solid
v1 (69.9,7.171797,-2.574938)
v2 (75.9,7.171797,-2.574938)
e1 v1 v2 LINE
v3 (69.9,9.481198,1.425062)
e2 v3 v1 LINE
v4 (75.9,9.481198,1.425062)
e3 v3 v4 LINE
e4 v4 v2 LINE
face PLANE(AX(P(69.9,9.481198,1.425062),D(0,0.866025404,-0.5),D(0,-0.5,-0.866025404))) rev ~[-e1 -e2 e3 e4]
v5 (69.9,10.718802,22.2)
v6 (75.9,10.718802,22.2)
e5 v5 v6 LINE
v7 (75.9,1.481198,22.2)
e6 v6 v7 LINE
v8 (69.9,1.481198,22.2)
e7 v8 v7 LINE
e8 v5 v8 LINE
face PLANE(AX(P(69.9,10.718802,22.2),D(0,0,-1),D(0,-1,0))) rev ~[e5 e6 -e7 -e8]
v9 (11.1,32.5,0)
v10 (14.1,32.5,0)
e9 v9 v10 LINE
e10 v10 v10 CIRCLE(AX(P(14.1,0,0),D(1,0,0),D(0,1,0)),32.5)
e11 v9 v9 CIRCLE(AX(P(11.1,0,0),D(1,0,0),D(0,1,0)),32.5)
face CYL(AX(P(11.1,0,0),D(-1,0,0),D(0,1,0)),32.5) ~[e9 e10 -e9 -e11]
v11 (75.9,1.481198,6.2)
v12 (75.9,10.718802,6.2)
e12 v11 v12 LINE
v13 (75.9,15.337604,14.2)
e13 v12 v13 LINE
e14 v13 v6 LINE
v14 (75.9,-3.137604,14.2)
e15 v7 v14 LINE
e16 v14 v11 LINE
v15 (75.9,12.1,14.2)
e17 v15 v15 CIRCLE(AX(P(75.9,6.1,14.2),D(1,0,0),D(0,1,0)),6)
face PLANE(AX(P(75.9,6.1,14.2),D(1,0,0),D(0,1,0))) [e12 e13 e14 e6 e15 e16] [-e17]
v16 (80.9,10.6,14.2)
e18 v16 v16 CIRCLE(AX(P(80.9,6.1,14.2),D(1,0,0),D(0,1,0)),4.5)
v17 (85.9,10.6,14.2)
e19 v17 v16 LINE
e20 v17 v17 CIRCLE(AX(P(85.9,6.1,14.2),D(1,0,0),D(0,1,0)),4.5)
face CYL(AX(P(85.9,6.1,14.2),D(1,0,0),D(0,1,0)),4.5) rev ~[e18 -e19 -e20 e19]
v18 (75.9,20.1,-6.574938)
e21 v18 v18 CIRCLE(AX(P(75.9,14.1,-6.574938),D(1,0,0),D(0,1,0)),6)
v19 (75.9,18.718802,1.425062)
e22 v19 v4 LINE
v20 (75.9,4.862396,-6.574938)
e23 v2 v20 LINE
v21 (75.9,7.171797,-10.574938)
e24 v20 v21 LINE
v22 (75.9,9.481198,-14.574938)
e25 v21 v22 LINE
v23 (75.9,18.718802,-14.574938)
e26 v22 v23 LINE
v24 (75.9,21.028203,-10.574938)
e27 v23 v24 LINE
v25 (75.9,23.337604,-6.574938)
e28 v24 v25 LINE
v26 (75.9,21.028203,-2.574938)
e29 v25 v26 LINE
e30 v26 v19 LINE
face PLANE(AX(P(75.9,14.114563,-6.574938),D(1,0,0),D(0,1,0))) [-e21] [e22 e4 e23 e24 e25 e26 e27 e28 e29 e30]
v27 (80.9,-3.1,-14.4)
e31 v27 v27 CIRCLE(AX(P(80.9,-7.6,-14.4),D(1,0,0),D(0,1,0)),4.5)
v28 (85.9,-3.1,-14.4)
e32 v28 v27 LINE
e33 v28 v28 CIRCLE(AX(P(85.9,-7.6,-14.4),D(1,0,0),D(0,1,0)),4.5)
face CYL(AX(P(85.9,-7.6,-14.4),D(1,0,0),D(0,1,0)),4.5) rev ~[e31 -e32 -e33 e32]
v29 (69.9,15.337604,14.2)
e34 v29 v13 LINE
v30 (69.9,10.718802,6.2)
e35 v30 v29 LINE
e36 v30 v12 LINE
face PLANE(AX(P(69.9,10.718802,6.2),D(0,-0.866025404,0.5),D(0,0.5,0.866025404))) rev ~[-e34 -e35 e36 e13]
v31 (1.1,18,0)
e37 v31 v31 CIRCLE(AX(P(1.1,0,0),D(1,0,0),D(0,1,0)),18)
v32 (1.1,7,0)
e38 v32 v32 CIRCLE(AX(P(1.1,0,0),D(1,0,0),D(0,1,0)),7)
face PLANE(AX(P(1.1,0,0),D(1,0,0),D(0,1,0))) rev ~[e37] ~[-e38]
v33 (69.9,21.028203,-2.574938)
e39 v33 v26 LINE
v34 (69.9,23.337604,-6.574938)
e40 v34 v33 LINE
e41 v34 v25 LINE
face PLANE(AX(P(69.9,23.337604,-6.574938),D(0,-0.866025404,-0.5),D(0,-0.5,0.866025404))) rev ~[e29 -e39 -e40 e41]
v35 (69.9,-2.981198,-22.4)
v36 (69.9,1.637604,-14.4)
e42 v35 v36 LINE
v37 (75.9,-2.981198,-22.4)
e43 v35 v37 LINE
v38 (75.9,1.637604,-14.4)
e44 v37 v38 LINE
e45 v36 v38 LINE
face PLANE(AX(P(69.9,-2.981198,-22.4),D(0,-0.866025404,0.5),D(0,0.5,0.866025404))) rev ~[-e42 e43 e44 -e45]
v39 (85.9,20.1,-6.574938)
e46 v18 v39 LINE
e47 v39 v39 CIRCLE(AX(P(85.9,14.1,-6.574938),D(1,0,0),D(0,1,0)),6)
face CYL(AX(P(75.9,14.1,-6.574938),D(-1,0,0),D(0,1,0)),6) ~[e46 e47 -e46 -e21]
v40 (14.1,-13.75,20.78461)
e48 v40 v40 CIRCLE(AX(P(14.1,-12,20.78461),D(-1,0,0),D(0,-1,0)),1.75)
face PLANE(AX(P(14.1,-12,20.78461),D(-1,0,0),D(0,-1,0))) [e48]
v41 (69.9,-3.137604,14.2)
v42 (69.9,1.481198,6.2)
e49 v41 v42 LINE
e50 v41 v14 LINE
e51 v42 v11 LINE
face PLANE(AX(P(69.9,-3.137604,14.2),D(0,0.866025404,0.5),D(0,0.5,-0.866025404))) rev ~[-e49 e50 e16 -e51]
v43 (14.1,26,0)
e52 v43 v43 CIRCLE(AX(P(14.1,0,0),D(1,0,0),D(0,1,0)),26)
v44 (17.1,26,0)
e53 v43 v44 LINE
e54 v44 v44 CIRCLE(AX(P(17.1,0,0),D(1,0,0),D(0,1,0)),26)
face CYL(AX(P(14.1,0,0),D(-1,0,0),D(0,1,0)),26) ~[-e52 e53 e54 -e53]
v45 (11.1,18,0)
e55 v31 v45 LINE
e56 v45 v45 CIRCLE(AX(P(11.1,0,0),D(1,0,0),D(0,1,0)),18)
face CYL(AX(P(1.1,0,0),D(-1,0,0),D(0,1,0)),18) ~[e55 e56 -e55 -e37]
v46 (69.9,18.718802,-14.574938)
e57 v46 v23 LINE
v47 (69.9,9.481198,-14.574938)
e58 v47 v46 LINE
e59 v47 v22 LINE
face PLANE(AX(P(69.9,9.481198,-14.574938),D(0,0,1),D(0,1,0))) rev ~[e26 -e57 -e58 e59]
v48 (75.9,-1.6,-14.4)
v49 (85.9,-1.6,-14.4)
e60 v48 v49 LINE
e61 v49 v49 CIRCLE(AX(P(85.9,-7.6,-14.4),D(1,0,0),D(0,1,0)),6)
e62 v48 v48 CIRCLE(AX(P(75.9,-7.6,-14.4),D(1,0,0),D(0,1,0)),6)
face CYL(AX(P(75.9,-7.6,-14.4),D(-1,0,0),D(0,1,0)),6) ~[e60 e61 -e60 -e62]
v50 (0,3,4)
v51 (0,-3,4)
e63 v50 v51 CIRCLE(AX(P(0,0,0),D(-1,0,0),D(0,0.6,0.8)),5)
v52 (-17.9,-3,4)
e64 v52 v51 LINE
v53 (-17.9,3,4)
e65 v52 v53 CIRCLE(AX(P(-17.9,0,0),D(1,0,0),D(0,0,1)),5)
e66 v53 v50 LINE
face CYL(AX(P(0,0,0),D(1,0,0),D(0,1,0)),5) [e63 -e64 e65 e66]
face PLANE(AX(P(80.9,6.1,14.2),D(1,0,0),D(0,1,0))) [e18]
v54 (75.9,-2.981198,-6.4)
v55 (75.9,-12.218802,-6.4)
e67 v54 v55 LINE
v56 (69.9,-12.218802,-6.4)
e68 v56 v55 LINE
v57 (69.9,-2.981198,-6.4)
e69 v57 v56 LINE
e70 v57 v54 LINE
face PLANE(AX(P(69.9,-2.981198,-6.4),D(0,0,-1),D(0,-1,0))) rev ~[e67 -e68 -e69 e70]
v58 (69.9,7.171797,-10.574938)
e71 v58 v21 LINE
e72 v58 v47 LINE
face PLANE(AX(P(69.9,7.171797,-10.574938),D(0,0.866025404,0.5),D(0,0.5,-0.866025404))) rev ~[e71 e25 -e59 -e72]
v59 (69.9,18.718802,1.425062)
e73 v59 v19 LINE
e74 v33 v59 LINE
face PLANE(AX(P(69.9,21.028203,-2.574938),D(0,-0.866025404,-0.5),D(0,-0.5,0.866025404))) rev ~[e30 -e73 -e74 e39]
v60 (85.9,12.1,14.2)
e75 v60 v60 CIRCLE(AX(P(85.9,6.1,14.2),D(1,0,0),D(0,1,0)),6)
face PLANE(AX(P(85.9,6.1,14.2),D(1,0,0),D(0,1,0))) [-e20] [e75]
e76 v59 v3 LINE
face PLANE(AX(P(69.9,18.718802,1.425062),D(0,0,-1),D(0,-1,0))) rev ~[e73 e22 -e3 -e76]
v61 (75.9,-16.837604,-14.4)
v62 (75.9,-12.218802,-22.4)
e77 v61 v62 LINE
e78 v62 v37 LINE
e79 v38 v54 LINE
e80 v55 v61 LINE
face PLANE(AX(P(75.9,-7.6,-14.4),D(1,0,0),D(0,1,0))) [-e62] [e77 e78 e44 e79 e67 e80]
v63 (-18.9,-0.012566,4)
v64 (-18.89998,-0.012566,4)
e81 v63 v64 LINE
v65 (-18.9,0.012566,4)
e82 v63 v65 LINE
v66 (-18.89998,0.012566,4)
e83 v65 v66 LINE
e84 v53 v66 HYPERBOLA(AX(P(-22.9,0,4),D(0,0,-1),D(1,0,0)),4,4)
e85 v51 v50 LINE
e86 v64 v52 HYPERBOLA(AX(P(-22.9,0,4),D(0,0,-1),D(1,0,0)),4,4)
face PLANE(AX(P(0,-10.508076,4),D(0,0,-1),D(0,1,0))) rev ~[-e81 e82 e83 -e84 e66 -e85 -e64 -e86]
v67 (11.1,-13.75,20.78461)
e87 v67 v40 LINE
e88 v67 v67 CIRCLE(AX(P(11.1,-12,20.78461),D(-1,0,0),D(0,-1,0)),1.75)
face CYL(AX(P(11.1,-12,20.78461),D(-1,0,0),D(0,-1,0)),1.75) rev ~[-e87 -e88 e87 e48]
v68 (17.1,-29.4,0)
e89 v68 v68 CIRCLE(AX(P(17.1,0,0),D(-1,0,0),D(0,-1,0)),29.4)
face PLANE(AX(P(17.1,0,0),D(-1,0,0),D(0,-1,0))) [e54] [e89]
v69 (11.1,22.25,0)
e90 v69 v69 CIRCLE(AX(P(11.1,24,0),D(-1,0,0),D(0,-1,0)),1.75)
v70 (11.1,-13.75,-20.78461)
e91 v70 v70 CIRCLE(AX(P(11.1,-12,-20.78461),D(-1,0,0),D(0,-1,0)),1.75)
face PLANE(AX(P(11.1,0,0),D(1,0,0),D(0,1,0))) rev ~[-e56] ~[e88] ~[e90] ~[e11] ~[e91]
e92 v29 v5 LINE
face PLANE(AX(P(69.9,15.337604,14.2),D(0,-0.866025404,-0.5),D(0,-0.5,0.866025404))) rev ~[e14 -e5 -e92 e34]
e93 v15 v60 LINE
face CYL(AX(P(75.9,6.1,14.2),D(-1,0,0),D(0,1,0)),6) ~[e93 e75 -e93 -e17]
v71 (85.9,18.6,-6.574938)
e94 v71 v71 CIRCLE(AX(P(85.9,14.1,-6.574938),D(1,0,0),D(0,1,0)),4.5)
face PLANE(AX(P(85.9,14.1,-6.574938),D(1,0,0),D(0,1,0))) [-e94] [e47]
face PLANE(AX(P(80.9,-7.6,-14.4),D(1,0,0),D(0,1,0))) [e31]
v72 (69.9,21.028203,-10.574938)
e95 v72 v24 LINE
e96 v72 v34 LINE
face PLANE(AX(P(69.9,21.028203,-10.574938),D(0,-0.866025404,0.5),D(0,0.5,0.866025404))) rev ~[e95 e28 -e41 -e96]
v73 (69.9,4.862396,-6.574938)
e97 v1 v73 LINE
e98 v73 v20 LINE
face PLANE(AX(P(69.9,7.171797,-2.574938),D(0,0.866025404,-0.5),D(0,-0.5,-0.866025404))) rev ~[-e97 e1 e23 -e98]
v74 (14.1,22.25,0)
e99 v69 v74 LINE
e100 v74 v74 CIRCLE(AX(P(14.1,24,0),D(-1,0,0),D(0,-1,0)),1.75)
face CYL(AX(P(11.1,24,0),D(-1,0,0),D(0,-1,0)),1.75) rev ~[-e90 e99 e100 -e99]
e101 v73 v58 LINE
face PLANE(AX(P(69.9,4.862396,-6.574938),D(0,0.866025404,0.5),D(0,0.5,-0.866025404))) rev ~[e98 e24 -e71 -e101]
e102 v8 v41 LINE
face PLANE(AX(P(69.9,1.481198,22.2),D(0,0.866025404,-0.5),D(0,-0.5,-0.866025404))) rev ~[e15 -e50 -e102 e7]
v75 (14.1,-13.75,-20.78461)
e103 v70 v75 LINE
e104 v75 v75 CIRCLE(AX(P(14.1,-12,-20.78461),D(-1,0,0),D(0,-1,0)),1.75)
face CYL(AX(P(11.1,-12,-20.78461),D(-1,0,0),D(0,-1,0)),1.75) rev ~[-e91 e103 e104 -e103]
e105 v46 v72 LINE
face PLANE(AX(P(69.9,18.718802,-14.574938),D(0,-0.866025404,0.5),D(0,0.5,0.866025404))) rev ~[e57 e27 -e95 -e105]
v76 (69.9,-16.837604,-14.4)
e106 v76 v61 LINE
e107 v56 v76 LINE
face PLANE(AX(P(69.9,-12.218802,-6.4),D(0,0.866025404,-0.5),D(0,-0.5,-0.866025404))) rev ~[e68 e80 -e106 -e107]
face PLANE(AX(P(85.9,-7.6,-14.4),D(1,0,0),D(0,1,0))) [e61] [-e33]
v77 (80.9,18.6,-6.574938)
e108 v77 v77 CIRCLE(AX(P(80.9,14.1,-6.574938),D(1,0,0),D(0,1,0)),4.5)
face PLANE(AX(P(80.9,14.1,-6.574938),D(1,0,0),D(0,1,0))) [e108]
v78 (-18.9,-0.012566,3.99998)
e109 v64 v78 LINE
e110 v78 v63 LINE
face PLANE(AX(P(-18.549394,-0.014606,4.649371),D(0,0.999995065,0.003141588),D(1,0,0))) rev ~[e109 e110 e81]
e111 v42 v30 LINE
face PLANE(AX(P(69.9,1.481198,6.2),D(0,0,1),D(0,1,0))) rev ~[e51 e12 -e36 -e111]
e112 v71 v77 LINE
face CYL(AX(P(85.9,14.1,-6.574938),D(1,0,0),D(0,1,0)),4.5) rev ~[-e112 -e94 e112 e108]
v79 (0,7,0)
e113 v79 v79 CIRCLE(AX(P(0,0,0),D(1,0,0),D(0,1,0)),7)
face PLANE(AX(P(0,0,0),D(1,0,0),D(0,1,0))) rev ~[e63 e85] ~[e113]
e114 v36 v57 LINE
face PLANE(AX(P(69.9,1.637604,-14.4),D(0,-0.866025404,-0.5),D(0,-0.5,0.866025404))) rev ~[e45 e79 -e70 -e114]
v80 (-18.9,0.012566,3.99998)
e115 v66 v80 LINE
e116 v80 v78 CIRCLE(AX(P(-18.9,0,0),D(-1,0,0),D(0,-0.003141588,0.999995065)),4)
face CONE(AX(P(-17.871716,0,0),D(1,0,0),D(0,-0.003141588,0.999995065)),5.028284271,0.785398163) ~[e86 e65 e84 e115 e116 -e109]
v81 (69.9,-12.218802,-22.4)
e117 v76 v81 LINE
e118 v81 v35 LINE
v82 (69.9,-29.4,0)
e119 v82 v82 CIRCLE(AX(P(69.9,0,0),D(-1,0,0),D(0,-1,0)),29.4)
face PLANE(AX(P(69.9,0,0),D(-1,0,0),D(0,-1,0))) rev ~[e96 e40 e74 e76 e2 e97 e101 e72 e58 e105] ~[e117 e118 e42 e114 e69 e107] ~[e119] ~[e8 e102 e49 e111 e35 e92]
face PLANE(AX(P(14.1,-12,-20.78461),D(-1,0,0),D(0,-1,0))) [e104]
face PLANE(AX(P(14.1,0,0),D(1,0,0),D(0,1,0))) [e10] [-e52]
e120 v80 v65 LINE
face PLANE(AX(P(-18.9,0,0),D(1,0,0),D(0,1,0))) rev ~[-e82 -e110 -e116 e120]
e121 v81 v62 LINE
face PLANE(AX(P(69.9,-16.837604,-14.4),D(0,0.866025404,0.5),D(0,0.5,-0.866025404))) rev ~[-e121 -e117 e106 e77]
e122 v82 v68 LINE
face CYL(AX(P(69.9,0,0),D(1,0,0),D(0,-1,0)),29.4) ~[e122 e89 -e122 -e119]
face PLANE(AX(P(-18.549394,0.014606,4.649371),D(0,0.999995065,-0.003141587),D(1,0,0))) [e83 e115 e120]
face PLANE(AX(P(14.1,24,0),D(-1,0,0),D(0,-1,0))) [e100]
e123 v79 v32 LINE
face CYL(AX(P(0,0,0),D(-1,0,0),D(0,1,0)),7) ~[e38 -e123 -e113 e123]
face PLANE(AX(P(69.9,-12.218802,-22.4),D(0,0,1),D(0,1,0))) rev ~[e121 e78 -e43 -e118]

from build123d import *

# Parameters (mm, degrees)
F0_R        = 5
F1_DEPTH    = 18.9
F2_W        = 21.1690347642
F2_H        = 4.931249544
F3_DEPTH    = 18.901
F4_T2_ANGLE = 359.64
F5_R        = 7
F6_DEPTH    = 1.1
F7_R        = 18
F8_DEPTH    = 10
F9_R        = 32.5
F10_DEPTH   = 3
F11_R       = 26
F12_DEPTH   = 3
F14_R       = 29.4
F15_DEPTH   = 52.8
F16_R       = 1.75
F17_DEPTH   = 3
F19_DEPTH   = 6
F20_R       = 6
F21_DEPTH   = 10
F22_R       = 4.5
F23_DEPTH   = 5


# Not quite as in the source:
# - a fillet or chamfer that OpenCascade refuses, or shapes differently, is made with other operations: its cross-section is extruded or revolved along the edge and cut away or added


with BuildPart() as f1:
    # F0 (on Right) → F1 (new body)
    with BuildSketch(Plane.YZ):
        Circle(F0_R)
    extrude(amount=-F1_DEPTH)

    # F2 (on Right) → F3 (cut, through all)
    with BuildSketch(Plane.YZ):
        with Locations((0.0764410943, 6.465624772)):
            Rectangle(F2_W, F2_H)
    extrude(amount=-F3_DEPTH, mode=Mode.SUBTRACT)

    # F4: chamfer of 1 on 1 edges, made by hand

    # F4_s1 → F4_t2 (revolve, cut)
    with BuildSketch(Plane(origin=(0, 0, 0), x_dir=(1, 0, 0), z_dir=(0, 0.9999950652, 0.0031415875))):
        with BuildLine():
            Line((-17.8717157288, -5.0282842712), (-18.9282842712, -3.9717157288))
            Line((-18.9282842712, -3.9717157288), (-18.9482842712, -3.9717157288))
            ThreePointArc((-18.9482842712, -3.9717157288), (-18.92, -4.4858578644), (-18.92, -5))
            Line((-18.92, -5), (-18.9, -5.02))
            ThreePointArc((-18.9, -5.02), (-18.3858578644, -5.02), (-17.8717157288, -5.0482842712))
            Line((-17.8717157288, -5.0482842712), (-17.8717157288, -5.0282842712))
        make_face()
    revolve(axis=Axis((-18.9, 0, 0), (1, 0, 0)), revolution_arc=F4_T2_ANGLE, mode=Mode.SUBTRACT)

    # F5 (on face) → F6 (join)
    with BuildSketch(Plane.YZ):
        Circle(F5_R)
    extrude(amount=F6_DEPTH)

    # F7 (on face) → F8 (join)
    with BuildSketch(Plane.YZ.offset(1.1)):
        Circle(F7_R)
    extrude(amount=F8_DEPTH)

    # F9 (on face) → F10 (join)
    with BuildSketch(Plane.YZ.offset(11.1)):
        Circle(F9_R)
    extrude(amount=F10_DEPTH)

    # F11 (on face) → F12 (join)
    with BuildSketch(Plane.YZ.offset(14.1)):
        Circle(F11_R)
    extrude(amount=F12_DEPTH)

    # F14 (on offset) → F15 (join, through all)
    with BuildSketch(Plane(origin=(69.9, 0, 0), x_dir=(0, -1, 0), z_dir=(-1, 0, 0))):
        Circle(F14_R)
    extrude(amount=F15_DEPTH)

    # F16 (on face) → F17 (cut)
    with BuildSketch(Plane(origin=(11.1, 0, 0), x_dir=(0, -1, 0), z_dir=(-1, 0, 0))):
        with Locations((-24, 0)):
            Circle(F16_R)
        with Locations((12, -20.7846096908)):
            Circle(F16_R)
        with Locations((12, 20.7846096908)):
            Circle(F16_R)
    extrude(amount=-F17_DEPTH, mode=Mode.SUBTRACT)

    # F18 (on face) → F19 (join)
    with BuildSketch(Plane.YZ.offset(69.9)):
        with BuildLine():
            ThreePointArc((21.0282031968, -10.574938038), (21.8274066017, -8.6454903731), (22.1, -6.57493798))
            ThreePointArc((22.1, -6.57493798), (21.8274066078, -4.5043856099), (21.0282032207, -2.5749379634))
            ThreePointArc((21.0282032207, -2.5749379634), (18.0999999917, 0.3532652551), (14.1, 1.42506202))
            ThreePointArc((14.1, 1.42506202), (10.1000001451, 0.3532653341), (7.1717969373, -2.5749376897))
            ThreePointArc((7.1717969373, -2.5749376897), (6.1, -6.5749379695), (7.1717969269, -10.5749382522))
            ThreePointArc((7.1717969269, -10.5749382522), (10.1000001361, -13.5031412888), (14.1, -14.57493798))
            ThreePointArc((14.1, -14.57493798), (18.099999971, -13.503141227), (21.0282031968, -10.574938038))
        make_face()
        with BuildLine():
            ThreePointArc((21.0282032207, -2.5749379634), (21.8274066078, -4.5043856099), (22.1, -6.57493798))
            ThreePointArc((22.1, -6.57493798), (21.8274066017, -8.6454903731), (21.0282031968, -10.574938038))
            Line((21.0282031968, -10.574938038), (23.337604307, -6.57493798))
            Line((23.337604307, -6.57493798), (21.0282032207, -2.5749379634))
        make_face()
        with BuildLine():
            ThreePointArc((14.1, 1.42506202), (18.0999999917, 0.3532652551), (21.0282032207, -2.5749379634))
            Line((21.0282032207, -2.5749379634), (18.7188021535, 1.42506202))
            Line((18.7188021535, 1.42506202), (14.1, 1.42506202))
        make_face()
        with BuildLine():
            Line((18.7188021535, -14.57493798), (21.0282031968, -10.574938038))
            ThreePointArc((21.0282031968, -10.574938038), (18.099999971, -13.503141227), (14.1, -14.57493798))
            Line((14.1, -14.57493798), (18.7188021535, -14.57493798))
        make_face()
        with BuildLine():
            ThreePointArc((7.1717969373, -2.5749376897), (10.1000001451, 0.3532653341), (14.1, 1.42506202))
            Line((14.1, 1.42506202), (9.4811978465, 1.42506202))
            Line((9.4811978465, 1.42506202), (7.1717969373, -2.5749376897))
        make_face()
        with BuildLine():
            Line((9.4811978465, -14.57493798), (14.1, -14.57493798))
            ThreePointArc((14.1, -14.57493798), (10.1000001361, -13.5031412888), (7.1717969269, -10.5749382522))
            Line((7.1717969269, -10.5749382522), (9.4811978465, -14.57493798))
        make_face()
        with BuildLine():
            ThreePointArc((7.1717969269, -10.5749382522), (6.1, -6.5749379695), (7.1717969373, -2.5749376897))
            Line((7.1717969373, -2.5749376897), (4.862395693, -6.57493798))
            Line((4.862395693, -6.57493798), (7.1717969269, -10.5749382522))
        make_face()
        Polygon((10.7188021535, 22.2), (1.4811978465, 22.2), (-3.137604307, 14.2), (1.4811978465, 6.2), (10.7188021535, 6.2), (15.337604307, 14.2), align=None)
        Polygon((-2.9811978465, -6.4), (-12.2188021535, -6.4), (-16.837604307, -14.4), (-12.2188021535, -22.4), (-2.9811978465, -22.4), (1.637604307, -14.4), align=None)
    extrude(amount=F19_DEPTH)

    # F20 (on face) → F21 (join)
    with BuildSketch(Plane.YZ.offset(75.9)):
        with Locations((6.1, 14.2)):
            Circle(F20_R)
        with Locations((14.1, -6.57493798)):
            Circle(F20_R)
        with Locations((-7.6, -14.4)):
            Circle(F20_R)
    extrude(amount=F21_DEPTH)

    # F22 (on face) → F23 (cut)
    with BuildSketch(Plane.YZ.offset(85.9)):
        with Locations((6.1, 14.2)):
            Circle(F22_R)
        with Locations((-7.6, -14.4)):
            Circle(F22_R)
        with Locations((14.1, -6.57493798)):
            Circle(F22_R)
    extrude(amount=-F23_DEPTH, mode=Mode.SUBTRACT)


solid = f1.part
